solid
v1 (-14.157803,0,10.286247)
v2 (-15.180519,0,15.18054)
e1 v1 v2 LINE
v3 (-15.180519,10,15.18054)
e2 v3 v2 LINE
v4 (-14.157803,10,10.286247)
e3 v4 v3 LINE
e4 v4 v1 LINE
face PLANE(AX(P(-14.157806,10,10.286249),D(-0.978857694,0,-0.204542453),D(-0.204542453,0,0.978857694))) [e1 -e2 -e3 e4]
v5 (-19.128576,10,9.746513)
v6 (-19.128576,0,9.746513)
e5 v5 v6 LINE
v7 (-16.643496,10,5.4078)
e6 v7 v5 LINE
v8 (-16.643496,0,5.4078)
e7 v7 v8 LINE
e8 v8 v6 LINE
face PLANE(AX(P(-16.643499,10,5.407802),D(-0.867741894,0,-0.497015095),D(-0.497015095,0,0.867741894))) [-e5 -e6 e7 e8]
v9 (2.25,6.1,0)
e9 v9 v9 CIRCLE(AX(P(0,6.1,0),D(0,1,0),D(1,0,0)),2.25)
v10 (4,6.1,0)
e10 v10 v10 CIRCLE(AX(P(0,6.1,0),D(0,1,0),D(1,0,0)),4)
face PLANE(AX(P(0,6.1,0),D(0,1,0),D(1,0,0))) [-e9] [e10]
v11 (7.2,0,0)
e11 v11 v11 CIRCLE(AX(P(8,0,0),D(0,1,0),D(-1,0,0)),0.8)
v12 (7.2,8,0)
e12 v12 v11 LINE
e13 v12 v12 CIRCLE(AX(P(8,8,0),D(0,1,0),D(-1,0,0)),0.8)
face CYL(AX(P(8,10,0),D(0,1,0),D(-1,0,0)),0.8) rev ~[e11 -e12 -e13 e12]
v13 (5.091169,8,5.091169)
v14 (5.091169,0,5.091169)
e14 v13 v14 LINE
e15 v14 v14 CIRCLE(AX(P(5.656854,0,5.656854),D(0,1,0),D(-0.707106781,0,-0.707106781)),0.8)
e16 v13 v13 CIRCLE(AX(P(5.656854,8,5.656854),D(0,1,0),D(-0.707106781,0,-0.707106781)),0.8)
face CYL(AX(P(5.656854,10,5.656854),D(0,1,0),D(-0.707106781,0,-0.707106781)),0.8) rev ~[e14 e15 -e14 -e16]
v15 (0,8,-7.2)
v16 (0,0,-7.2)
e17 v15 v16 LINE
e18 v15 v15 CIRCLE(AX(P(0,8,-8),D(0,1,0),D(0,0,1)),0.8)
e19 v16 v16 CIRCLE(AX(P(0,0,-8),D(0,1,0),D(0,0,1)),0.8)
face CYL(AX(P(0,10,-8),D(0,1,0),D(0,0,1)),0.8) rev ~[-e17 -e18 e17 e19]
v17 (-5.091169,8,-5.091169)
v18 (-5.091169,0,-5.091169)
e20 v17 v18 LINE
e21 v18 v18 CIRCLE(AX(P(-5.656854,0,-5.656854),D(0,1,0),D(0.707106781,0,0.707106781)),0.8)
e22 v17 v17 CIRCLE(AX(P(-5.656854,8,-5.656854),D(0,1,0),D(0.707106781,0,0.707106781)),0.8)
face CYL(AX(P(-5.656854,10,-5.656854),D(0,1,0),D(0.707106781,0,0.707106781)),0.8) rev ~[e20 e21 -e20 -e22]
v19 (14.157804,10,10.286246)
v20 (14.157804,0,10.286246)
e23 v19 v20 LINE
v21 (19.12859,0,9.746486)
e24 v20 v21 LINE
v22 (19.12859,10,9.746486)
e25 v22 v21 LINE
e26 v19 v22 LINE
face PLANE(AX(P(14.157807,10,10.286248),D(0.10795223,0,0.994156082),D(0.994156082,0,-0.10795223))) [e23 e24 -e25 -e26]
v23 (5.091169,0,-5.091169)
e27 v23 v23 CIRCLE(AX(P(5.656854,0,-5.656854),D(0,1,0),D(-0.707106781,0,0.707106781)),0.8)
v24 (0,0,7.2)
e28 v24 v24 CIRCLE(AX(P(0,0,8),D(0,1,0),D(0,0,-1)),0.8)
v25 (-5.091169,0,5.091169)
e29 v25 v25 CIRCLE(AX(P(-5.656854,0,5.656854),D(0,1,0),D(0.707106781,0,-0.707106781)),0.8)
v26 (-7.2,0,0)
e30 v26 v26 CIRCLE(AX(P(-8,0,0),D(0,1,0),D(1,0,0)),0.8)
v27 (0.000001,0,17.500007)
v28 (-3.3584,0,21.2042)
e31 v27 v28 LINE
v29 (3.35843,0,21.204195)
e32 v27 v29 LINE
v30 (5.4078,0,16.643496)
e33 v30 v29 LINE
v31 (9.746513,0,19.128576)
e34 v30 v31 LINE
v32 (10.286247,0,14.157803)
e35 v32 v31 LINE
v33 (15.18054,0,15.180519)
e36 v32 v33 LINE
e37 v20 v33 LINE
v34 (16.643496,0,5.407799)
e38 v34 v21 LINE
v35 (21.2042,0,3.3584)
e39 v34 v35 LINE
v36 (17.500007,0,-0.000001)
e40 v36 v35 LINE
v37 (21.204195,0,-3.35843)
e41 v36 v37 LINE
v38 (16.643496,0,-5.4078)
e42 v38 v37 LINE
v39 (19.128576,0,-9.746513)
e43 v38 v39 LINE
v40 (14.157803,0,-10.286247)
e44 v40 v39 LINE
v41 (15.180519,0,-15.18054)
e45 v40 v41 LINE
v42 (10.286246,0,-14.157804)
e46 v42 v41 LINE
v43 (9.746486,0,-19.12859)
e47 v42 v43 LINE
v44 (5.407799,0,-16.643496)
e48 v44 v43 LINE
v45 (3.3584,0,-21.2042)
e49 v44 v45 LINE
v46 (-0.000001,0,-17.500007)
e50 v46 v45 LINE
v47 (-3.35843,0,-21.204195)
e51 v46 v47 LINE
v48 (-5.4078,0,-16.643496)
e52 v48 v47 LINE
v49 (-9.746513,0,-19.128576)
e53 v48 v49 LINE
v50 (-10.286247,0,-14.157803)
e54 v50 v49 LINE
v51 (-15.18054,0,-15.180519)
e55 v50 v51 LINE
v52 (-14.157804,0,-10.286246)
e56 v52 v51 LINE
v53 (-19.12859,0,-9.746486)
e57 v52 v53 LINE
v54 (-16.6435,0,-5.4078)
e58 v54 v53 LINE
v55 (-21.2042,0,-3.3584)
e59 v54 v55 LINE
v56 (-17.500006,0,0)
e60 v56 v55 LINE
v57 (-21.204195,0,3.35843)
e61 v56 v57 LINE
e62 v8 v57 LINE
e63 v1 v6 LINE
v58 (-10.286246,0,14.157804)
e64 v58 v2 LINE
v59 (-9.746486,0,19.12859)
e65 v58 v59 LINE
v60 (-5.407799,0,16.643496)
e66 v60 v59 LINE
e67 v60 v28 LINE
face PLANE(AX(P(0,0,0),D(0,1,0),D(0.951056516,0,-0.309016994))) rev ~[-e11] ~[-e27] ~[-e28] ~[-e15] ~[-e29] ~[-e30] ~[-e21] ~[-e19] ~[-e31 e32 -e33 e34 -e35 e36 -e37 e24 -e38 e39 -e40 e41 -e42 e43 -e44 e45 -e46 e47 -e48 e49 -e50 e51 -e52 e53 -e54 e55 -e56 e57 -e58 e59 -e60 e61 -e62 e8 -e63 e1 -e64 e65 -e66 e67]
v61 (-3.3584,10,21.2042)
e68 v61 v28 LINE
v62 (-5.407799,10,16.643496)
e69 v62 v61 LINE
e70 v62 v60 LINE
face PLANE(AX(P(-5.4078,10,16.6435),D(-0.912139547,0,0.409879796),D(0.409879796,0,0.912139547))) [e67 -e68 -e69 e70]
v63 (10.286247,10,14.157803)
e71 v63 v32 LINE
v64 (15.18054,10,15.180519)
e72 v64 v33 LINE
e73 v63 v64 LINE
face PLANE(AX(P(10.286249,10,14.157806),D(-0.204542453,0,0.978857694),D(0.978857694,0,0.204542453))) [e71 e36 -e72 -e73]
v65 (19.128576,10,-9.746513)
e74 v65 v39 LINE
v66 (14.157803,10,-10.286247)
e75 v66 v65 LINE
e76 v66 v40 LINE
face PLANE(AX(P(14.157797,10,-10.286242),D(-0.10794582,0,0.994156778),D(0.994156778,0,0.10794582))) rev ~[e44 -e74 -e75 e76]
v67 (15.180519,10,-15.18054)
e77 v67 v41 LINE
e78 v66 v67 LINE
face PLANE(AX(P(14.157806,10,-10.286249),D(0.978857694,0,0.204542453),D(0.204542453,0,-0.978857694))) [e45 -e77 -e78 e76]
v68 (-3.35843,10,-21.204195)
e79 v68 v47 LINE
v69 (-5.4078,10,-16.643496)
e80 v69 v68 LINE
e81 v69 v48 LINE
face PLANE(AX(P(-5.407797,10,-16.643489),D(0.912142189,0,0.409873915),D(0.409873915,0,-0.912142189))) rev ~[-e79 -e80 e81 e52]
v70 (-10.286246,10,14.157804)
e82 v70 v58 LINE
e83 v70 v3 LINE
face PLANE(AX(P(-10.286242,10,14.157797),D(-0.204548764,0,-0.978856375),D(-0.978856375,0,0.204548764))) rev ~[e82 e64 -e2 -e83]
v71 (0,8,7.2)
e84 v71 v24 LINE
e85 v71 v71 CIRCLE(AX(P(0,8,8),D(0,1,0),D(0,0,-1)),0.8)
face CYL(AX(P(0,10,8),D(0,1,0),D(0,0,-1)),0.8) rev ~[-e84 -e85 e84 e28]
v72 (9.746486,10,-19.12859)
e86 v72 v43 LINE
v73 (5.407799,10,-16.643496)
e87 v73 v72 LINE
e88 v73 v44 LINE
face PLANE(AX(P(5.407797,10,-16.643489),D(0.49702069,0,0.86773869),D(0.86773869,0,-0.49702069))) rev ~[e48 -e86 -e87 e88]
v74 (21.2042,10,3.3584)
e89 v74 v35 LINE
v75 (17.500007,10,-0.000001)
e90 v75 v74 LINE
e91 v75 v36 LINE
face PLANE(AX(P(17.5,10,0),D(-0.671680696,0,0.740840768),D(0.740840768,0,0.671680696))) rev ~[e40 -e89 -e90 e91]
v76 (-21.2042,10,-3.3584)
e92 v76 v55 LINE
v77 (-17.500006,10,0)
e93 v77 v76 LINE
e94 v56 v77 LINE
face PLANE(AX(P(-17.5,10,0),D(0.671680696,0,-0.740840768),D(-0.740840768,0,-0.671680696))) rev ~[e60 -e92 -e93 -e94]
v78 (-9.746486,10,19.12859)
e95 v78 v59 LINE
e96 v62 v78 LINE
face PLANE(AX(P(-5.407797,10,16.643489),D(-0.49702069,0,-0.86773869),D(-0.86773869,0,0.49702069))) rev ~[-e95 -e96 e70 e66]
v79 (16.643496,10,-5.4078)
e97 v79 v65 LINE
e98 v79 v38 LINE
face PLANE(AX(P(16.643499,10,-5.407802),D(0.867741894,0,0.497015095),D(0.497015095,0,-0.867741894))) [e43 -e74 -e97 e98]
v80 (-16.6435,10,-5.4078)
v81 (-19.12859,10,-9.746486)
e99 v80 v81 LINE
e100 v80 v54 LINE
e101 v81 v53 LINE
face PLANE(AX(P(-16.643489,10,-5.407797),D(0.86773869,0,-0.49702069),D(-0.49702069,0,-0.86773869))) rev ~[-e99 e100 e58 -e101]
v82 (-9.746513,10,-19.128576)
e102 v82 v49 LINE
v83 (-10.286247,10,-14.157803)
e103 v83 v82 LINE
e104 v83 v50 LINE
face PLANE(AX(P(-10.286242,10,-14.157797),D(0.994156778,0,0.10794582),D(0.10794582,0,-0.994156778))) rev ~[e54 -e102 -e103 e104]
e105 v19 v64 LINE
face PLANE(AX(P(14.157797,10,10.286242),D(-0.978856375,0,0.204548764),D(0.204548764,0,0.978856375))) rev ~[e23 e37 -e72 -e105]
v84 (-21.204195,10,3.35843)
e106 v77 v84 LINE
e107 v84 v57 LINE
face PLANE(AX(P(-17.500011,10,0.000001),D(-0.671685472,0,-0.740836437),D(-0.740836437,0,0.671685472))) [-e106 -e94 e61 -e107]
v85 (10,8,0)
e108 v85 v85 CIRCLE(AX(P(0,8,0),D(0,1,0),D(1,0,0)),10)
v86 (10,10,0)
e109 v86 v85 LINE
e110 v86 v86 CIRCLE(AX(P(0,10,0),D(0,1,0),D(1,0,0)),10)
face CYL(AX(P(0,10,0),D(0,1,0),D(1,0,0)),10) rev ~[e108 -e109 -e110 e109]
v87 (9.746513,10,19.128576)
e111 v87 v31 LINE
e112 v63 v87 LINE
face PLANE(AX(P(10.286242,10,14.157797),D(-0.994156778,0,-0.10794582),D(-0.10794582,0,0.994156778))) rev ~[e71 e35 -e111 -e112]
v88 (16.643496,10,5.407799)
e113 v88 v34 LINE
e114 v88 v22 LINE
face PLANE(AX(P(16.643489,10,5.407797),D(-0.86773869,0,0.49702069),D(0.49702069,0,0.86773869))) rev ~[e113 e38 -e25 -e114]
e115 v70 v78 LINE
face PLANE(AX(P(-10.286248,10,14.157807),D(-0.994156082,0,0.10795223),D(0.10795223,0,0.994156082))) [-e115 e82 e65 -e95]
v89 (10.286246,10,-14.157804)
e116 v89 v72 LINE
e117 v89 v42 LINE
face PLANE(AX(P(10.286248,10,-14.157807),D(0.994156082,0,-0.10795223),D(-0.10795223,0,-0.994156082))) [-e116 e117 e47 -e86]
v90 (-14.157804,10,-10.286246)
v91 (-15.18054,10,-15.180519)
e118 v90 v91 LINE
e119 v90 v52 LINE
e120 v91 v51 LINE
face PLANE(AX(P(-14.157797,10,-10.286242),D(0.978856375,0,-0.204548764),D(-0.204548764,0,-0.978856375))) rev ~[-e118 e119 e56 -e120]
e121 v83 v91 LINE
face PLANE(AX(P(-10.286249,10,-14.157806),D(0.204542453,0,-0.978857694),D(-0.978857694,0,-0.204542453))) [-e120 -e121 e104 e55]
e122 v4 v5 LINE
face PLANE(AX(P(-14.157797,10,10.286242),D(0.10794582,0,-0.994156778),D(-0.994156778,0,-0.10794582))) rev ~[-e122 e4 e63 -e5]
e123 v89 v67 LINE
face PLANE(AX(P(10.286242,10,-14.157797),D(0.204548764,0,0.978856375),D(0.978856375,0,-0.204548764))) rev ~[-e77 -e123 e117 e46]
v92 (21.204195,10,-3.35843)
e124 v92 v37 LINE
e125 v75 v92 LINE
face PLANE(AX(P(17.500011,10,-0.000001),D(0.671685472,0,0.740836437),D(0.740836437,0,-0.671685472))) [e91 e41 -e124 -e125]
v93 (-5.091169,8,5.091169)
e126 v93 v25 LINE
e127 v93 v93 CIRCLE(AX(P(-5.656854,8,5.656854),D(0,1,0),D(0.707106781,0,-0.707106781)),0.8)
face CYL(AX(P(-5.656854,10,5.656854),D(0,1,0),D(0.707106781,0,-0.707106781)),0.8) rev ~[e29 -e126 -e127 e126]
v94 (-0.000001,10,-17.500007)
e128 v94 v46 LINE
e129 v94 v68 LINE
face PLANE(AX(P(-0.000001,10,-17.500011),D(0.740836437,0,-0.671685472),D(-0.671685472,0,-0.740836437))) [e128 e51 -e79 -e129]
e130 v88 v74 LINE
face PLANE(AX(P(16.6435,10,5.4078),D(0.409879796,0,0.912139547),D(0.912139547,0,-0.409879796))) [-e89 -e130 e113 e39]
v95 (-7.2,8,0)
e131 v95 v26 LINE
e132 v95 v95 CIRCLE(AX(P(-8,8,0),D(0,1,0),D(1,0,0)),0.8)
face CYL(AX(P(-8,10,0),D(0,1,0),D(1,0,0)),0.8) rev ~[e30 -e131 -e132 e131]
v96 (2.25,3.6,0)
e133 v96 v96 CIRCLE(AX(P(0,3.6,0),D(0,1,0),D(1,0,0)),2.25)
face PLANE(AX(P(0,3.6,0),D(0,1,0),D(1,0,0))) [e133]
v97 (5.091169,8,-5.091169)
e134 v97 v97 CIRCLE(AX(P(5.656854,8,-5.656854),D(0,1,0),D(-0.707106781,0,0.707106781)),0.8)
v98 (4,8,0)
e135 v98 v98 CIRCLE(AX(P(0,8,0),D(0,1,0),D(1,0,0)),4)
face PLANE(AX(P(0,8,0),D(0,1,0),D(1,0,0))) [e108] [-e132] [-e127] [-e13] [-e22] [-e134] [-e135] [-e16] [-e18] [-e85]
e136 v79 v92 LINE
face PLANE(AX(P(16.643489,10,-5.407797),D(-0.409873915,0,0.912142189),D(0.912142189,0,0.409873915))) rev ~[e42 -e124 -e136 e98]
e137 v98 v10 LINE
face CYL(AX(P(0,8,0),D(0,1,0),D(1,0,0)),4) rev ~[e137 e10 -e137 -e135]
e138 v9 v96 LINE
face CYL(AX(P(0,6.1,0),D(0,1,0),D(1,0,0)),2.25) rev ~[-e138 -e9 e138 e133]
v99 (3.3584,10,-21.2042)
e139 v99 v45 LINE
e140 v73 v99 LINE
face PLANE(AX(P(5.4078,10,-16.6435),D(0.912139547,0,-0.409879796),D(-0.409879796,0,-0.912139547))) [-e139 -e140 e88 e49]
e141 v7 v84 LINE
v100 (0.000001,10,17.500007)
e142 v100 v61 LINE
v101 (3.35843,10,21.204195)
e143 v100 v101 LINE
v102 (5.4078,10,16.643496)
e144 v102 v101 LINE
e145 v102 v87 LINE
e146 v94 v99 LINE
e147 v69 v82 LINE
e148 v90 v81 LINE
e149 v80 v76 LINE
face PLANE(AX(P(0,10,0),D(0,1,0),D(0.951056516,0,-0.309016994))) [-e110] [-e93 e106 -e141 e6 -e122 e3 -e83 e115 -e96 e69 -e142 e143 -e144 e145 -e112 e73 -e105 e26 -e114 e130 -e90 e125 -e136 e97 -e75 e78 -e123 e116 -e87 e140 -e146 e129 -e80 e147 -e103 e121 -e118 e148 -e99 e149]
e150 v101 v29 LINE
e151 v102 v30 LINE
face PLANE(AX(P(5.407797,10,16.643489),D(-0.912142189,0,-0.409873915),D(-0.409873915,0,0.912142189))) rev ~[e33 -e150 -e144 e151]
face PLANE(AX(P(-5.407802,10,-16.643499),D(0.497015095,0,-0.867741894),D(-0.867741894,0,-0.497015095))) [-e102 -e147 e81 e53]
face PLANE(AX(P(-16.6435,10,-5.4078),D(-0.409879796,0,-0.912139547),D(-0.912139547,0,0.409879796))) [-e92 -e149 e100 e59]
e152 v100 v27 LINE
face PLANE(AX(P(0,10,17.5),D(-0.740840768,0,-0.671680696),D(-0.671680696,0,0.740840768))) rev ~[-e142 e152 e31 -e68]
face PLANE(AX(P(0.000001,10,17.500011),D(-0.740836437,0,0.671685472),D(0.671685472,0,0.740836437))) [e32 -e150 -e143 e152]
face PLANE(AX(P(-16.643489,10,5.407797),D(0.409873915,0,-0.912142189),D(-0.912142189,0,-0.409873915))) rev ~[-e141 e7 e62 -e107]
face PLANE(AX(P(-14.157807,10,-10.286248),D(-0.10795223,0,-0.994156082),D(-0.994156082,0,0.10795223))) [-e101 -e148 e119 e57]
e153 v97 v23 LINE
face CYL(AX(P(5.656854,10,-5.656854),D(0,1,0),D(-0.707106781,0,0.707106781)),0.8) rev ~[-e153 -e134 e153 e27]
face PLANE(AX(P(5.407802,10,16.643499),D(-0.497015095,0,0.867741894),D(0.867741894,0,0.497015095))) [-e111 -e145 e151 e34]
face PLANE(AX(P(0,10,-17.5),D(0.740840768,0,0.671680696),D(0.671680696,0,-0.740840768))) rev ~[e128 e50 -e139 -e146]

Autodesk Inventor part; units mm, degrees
ref_plane "YZ Plane" through (0, 0, 0) normal (1, 0, 0) x (0, 1, 0)
ref_plane "XZ Plane" through (0, 0, 0) normal (0, 1, 0) x (-1, 0, 0)
ref_plane "XY Plane" through (0, 0, 0) normal (0, 0, 1) x (1, 0, 0)
sketch "Sketch1" plane through (0, 0, 0) normal (0, 1, 0) x (-1, 0, 0)
  circle A0 centre (0, 0) radius 17.5
  dimension "d0" = 35
extrude "Base" add sketch "Sketch1" along normal blind 10
sketch "Sketch2" plane through (0, 10, 0) normal (0, 1, 0) x (1, 0, 0)
  circle A0 centre (0, 0) radius 8
  circle A1 centre (-8, 0) radius 0.8
  dimension "d3" = 16
  dimension "d4" = 1.6
extrude "Mounting Hole" cut sketch "Sketch2" against normal through all contours A1 A0 | A0 A1 picked at (-7.7304, 0) picked at (-8.2616, 0.0332)
pattern_circular "Circular Pattern1" count 8 over 360 about axis through (0, 0, 0) along (0, 1, 0) of "Mounting Hole"
sketch "Sketch3" plane through (0, 10, 0) normal (0, 1, 0) x (1, 0, 0)
  arc A0 (-16.6435, 5.4078) -> (-17.5, 0) centre (0, 0) ccw
  line L0 (0, 0) -> (-16.6435, 5.4078) construction
  line L1 (0, 0) -> (-17.5, 0) construction
  line L2 (0, 0) -> (-25.2614, 4.001)
  line L3 (0, 0) -> (25.5763, 0) construction
  line L4 (-17.5, 0) -> (-21.2042, 3.3584)
  line L5 (-16.6435, 5.4078) -> (-21.2042, 3.3584)
  dimension "d11" = 18
  dimension "d12" = 171
  dimension "d13" = 5
extrude "Gear Tooth" add sketch "Sketch3" against normal blind 10
pattern_circular "Circular Pattern2" count 20 over 360 about axis through (0, 0, 0) along (0, 1, 0) of "Gear Tooth"
sketch "Sketch6" plane through (0, 10, 0) normal (0, 1, 0) x (1, 0, 0)
  point P0 (0, 0)
sketch "Sketch7" plane through (0, 10, 0) normal (0, 1, 0) x (1, 0, 0)
  circle A0 centre (0, 0) radius 10
  dimension "d26" = 20
extrude "Extrusion6" cut sketch "Sketch7" against normal blind 2
sketch "Sketch8" plane through (0, 8, 0) normal (0, 1, 0) x (1, 0, 0)
  circle A0 centre (0, 0) radius 4
  dimension "d29" = 8
extrude "Extrusion7" cut sketch "Sketch8" against normal blind 1.9
sketch "Sketch9" plane through (0, 6.1, 0) normal (0, 1, 0) x (1, 0, 0)
  circle A0 centre (0, 0) radius 2.25
  dimension "d32" = 4.5
extrude "Extrusion8" cut sketch "Sketch9" against normal blind 2.5
properties part number "JointSmallGear"
